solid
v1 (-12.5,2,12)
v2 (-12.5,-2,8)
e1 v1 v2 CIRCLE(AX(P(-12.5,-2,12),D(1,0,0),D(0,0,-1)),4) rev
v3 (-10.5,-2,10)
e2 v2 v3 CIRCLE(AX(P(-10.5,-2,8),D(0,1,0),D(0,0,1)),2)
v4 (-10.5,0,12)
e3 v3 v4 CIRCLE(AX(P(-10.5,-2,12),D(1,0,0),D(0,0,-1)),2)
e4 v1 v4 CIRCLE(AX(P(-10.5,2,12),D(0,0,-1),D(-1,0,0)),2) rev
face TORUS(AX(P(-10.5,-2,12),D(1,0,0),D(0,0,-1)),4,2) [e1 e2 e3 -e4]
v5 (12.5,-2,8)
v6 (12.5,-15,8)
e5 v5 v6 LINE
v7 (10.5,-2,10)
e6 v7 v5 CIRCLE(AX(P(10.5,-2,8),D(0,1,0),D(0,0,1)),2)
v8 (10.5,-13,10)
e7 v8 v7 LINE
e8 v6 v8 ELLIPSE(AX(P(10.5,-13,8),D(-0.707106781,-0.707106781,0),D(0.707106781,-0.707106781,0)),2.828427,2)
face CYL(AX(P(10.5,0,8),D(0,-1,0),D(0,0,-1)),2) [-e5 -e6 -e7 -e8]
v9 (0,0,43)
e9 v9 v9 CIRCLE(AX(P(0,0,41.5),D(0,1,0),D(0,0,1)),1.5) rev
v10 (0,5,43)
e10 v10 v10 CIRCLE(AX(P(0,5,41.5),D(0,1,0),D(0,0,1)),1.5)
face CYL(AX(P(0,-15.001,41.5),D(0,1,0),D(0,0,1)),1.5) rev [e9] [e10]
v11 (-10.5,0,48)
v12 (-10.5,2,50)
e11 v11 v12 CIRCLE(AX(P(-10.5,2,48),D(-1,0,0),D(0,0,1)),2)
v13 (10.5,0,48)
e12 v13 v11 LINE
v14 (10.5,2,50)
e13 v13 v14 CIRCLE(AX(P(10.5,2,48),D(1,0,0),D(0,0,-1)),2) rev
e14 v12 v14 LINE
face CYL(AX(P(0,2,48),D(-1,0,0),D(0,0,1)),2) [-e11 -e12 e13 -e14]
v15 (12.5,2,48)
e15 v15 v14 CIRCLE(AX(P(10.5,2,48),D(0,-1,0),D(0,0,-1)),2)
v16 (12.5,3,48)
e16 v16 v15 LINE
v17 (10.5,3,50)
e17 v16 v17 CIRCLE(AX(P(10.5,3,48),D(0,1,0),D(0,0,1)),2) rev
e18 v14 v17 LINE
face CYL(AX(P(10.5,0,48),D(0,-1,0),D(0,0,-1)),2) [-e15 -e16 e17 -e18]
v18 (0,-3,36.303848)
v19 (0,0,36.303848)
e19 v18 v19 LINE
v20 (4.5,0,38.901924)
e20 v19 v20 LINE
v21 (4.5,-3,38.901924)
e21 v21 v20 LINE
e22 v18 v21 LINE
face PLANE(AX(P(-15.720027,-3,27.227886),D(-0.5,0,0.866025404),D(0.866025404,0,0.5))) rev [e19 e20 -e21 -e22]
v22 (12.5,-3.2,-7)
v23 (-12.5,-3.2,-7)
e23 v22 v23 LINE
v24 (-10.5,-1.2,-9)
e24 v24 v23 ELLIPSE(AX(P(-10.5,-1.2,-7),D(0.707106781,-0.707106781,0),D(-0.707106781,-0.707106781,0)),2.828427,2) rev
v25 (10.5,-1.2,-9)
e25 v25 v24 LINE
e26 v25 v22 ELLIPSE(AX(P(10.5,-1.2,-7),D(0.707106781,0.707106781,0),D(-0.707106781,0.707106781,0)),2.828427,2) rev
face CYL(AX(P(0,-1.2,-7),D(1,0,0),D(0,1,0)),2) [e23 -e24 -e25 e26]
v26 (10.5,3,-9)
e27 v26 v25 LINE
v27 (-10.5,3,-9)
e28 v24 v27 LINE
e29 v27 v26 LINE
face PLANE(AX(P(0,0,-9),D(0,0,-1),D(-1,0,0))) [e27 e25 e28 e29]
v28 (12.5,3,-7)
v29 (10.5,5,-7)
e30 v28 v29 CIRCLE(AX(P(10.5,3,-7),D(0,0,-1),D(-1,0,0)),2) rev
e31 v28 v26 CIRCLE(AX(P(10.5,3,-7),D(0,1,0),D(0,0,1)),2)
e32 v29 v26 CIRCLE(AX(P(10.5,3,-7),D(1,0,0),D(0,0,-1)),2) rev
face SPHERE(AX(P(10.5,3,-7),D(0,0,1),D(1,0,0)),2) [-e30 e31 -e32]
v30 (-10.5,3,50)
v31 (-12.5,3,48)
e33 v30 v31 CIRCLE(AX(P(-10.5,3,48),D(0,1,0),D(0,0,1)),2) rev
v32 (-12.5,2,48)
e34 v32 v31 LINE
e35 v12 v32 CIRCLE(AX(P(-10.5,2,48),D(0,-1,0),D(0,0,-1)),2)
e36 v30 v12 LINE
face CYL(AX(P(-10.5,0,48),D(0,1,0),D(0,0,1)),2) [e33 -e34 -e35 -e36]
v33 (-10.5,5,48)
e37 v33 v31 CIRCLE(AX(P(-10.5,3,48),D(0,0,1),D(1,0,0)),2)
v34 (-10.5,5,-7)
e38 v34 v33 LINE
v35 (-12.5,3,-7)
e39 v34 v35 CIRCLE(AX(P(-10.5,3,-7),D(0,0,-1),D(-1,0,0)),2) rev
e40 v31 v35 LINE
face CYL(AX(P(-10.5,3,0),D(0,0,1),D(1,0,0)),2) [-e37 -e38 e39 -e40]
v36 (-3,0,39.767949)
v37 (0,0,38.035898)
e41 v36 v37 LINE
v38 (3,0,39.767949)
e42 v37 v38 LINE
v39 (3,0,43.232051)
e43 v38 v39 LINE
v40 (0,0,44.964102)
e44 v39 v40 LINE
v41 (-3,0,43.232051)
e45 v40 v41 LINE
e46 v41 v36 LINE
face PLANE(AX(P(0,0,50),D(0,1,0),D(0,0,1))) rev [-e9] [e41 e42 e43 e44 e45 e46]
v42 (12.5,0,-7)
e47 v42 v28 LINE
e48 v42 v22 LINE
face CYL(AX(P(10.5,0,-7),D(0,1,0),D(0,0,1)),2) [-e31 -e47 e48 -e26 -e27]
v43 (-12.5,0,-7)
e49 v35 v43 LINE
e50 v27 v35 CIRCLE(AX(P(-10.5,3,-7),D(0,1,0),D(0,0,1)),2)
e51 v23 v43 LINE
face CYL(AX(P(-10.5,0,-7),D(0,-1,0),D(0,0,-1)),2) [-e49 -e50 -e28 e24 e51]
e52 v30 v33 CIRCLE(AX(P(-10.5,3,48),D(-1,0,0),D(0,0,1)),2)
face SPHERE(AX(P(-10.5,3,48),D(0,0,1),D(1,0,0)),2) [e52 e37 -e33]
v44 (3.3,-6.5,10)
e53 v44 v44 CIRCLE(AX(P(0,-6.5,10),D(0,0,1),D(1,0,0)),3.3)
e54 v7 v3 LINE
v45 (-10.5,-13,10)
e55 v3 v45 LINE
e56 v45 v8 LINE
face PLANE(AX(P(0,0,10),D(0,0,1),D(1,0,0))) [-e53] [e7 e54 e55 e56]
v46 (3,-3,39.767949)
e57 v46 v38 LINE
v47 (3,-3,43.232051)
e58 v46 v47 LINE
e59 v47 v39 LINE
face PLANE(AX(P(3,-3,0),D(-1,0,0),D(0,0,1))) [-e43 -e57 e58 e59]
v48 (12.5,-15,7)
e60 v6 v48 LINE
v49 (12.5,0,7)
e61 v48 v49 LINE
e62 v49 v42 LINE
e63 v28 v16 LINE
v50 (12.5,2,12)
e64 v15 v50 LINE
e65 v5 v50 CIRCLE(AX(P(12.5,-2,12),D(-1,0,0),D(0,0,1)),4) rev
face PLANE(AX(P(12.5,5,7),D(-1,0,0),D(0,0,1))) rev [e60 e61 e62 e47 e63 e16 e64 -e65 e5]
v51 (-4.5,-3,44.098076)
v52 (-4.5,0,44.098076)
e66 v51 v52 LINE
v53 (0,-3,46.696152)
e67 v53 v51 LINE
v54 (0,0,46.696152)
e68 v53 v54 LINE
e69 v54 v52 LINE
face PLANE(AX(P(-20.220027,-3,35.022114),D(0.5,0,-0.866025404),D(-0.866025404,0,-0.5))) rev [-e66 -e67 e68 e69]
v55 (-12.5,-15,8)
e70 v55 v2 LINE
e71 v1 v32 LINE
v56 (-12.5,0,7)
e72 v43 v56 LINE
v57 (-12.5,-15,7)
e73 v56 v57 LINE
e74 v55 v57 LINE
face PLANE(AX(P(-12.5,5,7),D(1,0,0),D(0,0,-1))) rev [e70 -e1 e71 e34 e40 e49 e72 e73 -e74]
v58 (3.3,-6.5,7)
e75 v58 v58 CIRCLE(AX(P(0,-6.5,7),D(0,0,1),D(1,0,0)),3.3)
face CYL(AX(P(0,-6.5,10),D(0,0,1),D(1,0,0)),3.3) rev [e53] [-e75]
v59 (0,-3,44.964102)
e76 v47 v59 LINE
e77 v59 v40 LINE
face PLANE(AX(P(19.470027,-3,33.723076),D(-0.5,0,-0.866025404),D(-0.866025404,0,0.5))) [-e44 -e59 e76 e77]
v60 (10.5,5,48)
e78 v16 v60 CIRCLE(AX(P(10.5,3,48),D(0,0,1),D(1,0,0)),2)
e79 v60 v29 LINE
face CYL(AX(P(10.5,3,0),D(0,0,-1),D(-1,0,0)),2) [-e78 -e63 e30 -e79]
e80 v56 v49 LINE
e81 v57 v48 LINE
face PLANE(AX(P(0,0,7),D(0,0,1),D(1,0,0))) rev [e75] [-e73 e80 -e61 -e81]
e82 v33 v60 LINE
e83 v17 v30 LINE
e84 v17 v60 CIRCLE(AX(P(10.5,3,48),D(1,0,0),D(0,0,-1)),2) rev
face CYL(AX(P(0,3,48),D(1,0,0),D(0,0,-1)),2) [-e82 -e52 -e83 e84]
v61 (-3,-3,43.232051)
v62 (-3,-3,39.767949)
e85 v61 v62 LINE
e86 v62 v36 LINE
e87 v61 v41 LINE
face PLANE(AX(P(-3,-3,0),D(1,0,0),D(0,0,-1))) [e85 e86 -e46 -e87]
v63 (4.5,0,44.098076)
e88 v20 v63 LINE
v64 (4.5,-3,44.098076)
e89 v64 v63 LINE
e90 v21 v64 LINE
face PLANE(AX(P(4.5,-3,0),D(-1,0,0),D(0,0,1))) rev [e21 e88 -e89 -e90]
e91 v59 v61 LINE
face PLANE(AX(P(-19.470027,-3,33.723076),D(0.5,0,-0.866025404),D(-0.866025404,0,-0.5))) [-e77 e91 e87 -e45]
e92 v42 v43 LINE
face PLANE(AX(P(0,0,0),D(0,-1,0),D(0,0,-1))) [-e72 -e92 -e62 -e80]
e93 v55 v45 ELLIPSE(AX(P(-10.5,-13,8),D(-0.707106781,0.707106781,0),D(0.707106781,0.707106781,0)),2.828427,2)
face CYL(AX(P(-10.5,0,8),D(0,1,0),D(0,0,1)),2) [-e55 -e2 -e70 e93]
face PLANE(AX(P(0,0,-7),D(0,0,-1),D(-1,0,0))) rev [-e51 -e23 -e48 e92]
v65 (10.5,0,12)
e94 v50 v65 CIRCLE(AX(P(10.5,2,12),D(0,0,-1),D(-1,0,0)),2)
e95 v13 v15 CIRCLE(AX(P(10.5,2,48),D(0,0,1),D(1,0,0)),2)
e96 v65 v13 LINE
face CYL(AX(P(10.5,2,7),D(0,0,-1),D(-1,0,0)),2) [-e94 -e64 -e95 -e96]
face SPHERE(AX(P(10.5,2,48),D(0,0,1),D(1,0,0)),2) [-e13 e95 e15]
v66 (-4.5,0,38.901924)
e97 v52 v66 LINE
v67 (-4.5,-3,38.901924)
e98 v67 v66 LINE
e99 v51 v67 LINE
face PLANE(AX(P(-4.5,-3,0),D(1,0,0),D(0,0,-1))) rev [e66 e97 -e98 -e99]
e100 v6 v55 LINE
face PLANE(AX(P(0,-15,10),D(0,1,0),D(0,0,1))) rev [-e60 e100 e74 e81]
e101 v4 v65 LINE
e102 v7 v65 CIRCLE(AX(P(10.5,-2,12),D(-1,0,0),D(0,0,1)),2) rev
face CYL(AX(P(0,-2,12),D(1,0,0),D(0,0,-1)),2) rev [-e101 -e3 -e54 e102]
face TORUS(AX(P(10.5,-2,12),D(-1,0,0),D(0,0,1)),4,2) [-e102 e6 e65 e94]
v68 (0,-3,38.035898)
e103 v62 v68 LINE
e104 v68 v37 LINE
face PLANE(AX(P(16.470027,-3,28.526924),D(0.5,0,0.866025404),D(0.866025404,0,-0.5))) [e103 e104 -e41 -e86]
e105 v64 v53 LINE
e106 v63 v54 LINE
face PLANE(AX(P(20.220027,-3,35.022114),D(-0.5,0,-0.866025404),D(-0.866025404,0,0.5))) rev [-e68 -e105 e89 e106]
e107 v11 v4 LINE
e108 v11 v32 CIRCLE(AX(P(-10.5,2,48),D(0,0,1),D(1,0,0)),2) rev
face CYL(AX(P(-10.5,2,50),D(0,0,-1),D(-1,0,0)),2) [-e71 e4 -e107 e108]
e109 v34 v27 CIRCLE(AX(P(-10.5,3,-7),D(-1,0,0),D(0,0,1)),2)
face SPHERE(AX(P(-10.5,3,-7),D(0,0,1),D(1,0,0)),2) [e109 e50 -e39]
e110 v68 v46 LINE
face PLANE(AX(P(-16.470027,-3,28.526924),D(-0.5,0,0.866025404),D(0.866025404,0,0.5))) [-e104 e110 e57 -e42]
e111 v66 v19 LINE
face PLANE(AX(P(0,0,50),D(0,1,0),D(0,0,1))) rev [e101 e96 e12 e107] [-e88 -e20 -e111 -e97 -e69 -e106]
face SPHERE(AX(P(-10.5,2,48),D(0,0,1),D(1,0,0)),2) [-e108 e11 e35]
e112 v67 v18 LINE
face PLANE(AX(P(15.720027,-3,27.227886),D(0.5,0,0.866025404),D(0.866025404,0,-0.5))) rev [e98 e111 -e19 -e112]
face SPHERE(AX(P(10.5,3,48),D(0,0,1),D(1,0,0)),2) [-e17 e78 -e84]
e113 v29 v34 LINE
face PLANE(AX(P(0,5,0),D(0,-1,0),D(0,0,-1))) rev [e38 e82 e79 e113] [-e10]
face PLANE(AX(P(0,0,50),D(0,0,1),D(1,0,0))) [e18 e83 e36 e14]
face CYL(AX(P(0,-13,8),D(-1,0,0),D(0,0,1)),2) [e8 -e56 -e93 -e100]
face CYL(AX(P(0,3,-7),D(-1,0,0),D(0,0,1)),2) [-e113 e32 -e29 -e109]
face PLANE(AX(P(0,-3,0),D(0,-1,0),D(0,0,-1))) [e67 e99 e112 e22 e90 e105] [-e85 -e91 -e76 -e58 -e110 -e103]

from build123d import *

# Parameters (mm, degrees)
SKETCH1_W            = 25
SKETCH1_H            = 14
BOSS_EXTRUDE1_DEPTH  = 5
SKETCH2_W            = 25
SKETCH2_H            = 5
SKETCH2_H_2          = 15
BOSS_EXTRUDE2_DEPTH  = 3
M6_CLEARANCE_HOLE1_D = 6.6
SKETCH10_W           = 25
SKETCH10_H           = 5
BOSS_EXTRUDE5_DEPTH  = 2
SKETCH5_W            = 25
SKETCH5_H            = 5
BOSS_EXTRUDE4_DEPTH  = 40
CUT_EXTRUDE1_REACH   = 57.283
SKETCH9_R            = 1.5
FILLET1_R            = 2
BOSS_EXTRUDE6_DEPTH  = 3


with BuildPart() as part:
    # Sketch1 → Boss-Extrude1 (new body)
    with BuildSketch(Plane(origin=(0, 0, 0), x_dir=(1, 0, 0), z_dir=(0, 1, 0))):
        Rectangle(SKETCH1_W, SKETCH1_H)
    extrude(amount=BOSS_EXTRUDE1_DEPTH)

    # Sketch2 → Boss-Extrude2 (add)
    with BuildSketch(Plane.XY.offset(7)):
        with Locations((0, 2.5)):
            Rectangle(SKETCH2_W, SKETCH2_H)
        with Locations((0, -7.5)):
            Rectangle(SKETCH2_W, SKETCH2_H_2)
    extrude(amount=BOSS_EXTRUDE2_DEPTH)

    # M6 Clearance Hole1 (through all)
    with Locations(Plane.XY.offset(10)):
        with Locations((0, -6.5)):
            Hole(M6_CLEARANCE_HOLE1_D / 2)

    # Sketch10 → Boss-Extrude5 (add)
    with BuildSketch(Plane(origin=(0, 0, -7), x_dir=(-1, 0, 0), z_dir=(0, 0, -1))):
        Polygon((-12.5, 0), (-12.5, -3.2), (1e-09, -3.2), (12.5, -3.2), (12.5, 0), align=None)
        with Locations((0, 2.5)):
            Rectangle(SKETCH10_W, SKETCH10_H)
    extrude(amount=BOSS_EXTRUDE5_DEPTH)

    # Sketch5 → Boss-Extrude4 (add)
    with BuildSketch(Plane.XY.offset(10)):
        with Locations((0, 2.5)):
            Rectangle(SKETCH5_W, SKETCH5_H)
    extrude(amount=BOSS_EXTRUDE4_DEPTH)

    # Sketch9 → Cut-Extrude1 (cut, up to next)
    with BuildSketch(Plane(origin=(0, 5, 0), x_dir=(1, 0, 0), z_dir=(0, 1, 0)), mode=Mode.PRIVATE) as cut_extrude1_sk1:
        with Locations(Location((0, -41.5, 0), (0, 0, 270))):
            Circle(SKETCH9_R)
    cut_extrude1_tool1 = extrude(cut_extrude1_sk1.sketch, amount=-CUT_EXTRUDE1_REACH, mode=Mode.PRIVATE) & part.part
    add(cut_extrude1_tool1.solids().sort_by_distance((0, 5, 41.5))[0], mode=Mode.SUBTRACT)

    # Fillet1
    fillet1_edges = [part.edges().sort_by_distance(p)[0] for p in [
        (12.5, 0, 30),
        (-12.5, 0, 30),
        (0, -15, 10),
        (0, -3.2, -9),
        (0, 5, -9),
        (12.5, 5, 20.5),
        (0, 0, 50),
        (0, 5, 50),
        (-12.5, 5, 20.5),
        (0, 0, 10),
        (12.5, -7.5, 10),
        (-12.5, -7.5, 10),
        (-12.5, 0.9, -9),
        (12.5, 0.9, -9),
        (-12.5, 2.5, 50),
        (12.5, 2.5, 50),
    ]]
    fillet(fillet1_edges, radius=FILLET1_R - 0.0001)  # a hair under: the kernel refuses the full size

    # Sketch11 → Boss-Extrude6 (add)
    with BuildSketch(Plane.XZ):
        Polygon((4.5, 38.901923789), (4.5, 44.098076211), (0, 46.696152423), (-4.5, 44.098076211), (-4.5, 38.901923789), (0, 36.303847577), align=None)
        Polygon((0, 44.964101615), (-3, 43.232050808), (-3, 39.767949192), (0, 38.035898385), (3, 39.767949192), (3, 43.232050808), align=None, mode=Mode.SUBTRACT)
    extrude(amount=BOSS_EXTRUDE6_DEPTH)


solid = part.part
